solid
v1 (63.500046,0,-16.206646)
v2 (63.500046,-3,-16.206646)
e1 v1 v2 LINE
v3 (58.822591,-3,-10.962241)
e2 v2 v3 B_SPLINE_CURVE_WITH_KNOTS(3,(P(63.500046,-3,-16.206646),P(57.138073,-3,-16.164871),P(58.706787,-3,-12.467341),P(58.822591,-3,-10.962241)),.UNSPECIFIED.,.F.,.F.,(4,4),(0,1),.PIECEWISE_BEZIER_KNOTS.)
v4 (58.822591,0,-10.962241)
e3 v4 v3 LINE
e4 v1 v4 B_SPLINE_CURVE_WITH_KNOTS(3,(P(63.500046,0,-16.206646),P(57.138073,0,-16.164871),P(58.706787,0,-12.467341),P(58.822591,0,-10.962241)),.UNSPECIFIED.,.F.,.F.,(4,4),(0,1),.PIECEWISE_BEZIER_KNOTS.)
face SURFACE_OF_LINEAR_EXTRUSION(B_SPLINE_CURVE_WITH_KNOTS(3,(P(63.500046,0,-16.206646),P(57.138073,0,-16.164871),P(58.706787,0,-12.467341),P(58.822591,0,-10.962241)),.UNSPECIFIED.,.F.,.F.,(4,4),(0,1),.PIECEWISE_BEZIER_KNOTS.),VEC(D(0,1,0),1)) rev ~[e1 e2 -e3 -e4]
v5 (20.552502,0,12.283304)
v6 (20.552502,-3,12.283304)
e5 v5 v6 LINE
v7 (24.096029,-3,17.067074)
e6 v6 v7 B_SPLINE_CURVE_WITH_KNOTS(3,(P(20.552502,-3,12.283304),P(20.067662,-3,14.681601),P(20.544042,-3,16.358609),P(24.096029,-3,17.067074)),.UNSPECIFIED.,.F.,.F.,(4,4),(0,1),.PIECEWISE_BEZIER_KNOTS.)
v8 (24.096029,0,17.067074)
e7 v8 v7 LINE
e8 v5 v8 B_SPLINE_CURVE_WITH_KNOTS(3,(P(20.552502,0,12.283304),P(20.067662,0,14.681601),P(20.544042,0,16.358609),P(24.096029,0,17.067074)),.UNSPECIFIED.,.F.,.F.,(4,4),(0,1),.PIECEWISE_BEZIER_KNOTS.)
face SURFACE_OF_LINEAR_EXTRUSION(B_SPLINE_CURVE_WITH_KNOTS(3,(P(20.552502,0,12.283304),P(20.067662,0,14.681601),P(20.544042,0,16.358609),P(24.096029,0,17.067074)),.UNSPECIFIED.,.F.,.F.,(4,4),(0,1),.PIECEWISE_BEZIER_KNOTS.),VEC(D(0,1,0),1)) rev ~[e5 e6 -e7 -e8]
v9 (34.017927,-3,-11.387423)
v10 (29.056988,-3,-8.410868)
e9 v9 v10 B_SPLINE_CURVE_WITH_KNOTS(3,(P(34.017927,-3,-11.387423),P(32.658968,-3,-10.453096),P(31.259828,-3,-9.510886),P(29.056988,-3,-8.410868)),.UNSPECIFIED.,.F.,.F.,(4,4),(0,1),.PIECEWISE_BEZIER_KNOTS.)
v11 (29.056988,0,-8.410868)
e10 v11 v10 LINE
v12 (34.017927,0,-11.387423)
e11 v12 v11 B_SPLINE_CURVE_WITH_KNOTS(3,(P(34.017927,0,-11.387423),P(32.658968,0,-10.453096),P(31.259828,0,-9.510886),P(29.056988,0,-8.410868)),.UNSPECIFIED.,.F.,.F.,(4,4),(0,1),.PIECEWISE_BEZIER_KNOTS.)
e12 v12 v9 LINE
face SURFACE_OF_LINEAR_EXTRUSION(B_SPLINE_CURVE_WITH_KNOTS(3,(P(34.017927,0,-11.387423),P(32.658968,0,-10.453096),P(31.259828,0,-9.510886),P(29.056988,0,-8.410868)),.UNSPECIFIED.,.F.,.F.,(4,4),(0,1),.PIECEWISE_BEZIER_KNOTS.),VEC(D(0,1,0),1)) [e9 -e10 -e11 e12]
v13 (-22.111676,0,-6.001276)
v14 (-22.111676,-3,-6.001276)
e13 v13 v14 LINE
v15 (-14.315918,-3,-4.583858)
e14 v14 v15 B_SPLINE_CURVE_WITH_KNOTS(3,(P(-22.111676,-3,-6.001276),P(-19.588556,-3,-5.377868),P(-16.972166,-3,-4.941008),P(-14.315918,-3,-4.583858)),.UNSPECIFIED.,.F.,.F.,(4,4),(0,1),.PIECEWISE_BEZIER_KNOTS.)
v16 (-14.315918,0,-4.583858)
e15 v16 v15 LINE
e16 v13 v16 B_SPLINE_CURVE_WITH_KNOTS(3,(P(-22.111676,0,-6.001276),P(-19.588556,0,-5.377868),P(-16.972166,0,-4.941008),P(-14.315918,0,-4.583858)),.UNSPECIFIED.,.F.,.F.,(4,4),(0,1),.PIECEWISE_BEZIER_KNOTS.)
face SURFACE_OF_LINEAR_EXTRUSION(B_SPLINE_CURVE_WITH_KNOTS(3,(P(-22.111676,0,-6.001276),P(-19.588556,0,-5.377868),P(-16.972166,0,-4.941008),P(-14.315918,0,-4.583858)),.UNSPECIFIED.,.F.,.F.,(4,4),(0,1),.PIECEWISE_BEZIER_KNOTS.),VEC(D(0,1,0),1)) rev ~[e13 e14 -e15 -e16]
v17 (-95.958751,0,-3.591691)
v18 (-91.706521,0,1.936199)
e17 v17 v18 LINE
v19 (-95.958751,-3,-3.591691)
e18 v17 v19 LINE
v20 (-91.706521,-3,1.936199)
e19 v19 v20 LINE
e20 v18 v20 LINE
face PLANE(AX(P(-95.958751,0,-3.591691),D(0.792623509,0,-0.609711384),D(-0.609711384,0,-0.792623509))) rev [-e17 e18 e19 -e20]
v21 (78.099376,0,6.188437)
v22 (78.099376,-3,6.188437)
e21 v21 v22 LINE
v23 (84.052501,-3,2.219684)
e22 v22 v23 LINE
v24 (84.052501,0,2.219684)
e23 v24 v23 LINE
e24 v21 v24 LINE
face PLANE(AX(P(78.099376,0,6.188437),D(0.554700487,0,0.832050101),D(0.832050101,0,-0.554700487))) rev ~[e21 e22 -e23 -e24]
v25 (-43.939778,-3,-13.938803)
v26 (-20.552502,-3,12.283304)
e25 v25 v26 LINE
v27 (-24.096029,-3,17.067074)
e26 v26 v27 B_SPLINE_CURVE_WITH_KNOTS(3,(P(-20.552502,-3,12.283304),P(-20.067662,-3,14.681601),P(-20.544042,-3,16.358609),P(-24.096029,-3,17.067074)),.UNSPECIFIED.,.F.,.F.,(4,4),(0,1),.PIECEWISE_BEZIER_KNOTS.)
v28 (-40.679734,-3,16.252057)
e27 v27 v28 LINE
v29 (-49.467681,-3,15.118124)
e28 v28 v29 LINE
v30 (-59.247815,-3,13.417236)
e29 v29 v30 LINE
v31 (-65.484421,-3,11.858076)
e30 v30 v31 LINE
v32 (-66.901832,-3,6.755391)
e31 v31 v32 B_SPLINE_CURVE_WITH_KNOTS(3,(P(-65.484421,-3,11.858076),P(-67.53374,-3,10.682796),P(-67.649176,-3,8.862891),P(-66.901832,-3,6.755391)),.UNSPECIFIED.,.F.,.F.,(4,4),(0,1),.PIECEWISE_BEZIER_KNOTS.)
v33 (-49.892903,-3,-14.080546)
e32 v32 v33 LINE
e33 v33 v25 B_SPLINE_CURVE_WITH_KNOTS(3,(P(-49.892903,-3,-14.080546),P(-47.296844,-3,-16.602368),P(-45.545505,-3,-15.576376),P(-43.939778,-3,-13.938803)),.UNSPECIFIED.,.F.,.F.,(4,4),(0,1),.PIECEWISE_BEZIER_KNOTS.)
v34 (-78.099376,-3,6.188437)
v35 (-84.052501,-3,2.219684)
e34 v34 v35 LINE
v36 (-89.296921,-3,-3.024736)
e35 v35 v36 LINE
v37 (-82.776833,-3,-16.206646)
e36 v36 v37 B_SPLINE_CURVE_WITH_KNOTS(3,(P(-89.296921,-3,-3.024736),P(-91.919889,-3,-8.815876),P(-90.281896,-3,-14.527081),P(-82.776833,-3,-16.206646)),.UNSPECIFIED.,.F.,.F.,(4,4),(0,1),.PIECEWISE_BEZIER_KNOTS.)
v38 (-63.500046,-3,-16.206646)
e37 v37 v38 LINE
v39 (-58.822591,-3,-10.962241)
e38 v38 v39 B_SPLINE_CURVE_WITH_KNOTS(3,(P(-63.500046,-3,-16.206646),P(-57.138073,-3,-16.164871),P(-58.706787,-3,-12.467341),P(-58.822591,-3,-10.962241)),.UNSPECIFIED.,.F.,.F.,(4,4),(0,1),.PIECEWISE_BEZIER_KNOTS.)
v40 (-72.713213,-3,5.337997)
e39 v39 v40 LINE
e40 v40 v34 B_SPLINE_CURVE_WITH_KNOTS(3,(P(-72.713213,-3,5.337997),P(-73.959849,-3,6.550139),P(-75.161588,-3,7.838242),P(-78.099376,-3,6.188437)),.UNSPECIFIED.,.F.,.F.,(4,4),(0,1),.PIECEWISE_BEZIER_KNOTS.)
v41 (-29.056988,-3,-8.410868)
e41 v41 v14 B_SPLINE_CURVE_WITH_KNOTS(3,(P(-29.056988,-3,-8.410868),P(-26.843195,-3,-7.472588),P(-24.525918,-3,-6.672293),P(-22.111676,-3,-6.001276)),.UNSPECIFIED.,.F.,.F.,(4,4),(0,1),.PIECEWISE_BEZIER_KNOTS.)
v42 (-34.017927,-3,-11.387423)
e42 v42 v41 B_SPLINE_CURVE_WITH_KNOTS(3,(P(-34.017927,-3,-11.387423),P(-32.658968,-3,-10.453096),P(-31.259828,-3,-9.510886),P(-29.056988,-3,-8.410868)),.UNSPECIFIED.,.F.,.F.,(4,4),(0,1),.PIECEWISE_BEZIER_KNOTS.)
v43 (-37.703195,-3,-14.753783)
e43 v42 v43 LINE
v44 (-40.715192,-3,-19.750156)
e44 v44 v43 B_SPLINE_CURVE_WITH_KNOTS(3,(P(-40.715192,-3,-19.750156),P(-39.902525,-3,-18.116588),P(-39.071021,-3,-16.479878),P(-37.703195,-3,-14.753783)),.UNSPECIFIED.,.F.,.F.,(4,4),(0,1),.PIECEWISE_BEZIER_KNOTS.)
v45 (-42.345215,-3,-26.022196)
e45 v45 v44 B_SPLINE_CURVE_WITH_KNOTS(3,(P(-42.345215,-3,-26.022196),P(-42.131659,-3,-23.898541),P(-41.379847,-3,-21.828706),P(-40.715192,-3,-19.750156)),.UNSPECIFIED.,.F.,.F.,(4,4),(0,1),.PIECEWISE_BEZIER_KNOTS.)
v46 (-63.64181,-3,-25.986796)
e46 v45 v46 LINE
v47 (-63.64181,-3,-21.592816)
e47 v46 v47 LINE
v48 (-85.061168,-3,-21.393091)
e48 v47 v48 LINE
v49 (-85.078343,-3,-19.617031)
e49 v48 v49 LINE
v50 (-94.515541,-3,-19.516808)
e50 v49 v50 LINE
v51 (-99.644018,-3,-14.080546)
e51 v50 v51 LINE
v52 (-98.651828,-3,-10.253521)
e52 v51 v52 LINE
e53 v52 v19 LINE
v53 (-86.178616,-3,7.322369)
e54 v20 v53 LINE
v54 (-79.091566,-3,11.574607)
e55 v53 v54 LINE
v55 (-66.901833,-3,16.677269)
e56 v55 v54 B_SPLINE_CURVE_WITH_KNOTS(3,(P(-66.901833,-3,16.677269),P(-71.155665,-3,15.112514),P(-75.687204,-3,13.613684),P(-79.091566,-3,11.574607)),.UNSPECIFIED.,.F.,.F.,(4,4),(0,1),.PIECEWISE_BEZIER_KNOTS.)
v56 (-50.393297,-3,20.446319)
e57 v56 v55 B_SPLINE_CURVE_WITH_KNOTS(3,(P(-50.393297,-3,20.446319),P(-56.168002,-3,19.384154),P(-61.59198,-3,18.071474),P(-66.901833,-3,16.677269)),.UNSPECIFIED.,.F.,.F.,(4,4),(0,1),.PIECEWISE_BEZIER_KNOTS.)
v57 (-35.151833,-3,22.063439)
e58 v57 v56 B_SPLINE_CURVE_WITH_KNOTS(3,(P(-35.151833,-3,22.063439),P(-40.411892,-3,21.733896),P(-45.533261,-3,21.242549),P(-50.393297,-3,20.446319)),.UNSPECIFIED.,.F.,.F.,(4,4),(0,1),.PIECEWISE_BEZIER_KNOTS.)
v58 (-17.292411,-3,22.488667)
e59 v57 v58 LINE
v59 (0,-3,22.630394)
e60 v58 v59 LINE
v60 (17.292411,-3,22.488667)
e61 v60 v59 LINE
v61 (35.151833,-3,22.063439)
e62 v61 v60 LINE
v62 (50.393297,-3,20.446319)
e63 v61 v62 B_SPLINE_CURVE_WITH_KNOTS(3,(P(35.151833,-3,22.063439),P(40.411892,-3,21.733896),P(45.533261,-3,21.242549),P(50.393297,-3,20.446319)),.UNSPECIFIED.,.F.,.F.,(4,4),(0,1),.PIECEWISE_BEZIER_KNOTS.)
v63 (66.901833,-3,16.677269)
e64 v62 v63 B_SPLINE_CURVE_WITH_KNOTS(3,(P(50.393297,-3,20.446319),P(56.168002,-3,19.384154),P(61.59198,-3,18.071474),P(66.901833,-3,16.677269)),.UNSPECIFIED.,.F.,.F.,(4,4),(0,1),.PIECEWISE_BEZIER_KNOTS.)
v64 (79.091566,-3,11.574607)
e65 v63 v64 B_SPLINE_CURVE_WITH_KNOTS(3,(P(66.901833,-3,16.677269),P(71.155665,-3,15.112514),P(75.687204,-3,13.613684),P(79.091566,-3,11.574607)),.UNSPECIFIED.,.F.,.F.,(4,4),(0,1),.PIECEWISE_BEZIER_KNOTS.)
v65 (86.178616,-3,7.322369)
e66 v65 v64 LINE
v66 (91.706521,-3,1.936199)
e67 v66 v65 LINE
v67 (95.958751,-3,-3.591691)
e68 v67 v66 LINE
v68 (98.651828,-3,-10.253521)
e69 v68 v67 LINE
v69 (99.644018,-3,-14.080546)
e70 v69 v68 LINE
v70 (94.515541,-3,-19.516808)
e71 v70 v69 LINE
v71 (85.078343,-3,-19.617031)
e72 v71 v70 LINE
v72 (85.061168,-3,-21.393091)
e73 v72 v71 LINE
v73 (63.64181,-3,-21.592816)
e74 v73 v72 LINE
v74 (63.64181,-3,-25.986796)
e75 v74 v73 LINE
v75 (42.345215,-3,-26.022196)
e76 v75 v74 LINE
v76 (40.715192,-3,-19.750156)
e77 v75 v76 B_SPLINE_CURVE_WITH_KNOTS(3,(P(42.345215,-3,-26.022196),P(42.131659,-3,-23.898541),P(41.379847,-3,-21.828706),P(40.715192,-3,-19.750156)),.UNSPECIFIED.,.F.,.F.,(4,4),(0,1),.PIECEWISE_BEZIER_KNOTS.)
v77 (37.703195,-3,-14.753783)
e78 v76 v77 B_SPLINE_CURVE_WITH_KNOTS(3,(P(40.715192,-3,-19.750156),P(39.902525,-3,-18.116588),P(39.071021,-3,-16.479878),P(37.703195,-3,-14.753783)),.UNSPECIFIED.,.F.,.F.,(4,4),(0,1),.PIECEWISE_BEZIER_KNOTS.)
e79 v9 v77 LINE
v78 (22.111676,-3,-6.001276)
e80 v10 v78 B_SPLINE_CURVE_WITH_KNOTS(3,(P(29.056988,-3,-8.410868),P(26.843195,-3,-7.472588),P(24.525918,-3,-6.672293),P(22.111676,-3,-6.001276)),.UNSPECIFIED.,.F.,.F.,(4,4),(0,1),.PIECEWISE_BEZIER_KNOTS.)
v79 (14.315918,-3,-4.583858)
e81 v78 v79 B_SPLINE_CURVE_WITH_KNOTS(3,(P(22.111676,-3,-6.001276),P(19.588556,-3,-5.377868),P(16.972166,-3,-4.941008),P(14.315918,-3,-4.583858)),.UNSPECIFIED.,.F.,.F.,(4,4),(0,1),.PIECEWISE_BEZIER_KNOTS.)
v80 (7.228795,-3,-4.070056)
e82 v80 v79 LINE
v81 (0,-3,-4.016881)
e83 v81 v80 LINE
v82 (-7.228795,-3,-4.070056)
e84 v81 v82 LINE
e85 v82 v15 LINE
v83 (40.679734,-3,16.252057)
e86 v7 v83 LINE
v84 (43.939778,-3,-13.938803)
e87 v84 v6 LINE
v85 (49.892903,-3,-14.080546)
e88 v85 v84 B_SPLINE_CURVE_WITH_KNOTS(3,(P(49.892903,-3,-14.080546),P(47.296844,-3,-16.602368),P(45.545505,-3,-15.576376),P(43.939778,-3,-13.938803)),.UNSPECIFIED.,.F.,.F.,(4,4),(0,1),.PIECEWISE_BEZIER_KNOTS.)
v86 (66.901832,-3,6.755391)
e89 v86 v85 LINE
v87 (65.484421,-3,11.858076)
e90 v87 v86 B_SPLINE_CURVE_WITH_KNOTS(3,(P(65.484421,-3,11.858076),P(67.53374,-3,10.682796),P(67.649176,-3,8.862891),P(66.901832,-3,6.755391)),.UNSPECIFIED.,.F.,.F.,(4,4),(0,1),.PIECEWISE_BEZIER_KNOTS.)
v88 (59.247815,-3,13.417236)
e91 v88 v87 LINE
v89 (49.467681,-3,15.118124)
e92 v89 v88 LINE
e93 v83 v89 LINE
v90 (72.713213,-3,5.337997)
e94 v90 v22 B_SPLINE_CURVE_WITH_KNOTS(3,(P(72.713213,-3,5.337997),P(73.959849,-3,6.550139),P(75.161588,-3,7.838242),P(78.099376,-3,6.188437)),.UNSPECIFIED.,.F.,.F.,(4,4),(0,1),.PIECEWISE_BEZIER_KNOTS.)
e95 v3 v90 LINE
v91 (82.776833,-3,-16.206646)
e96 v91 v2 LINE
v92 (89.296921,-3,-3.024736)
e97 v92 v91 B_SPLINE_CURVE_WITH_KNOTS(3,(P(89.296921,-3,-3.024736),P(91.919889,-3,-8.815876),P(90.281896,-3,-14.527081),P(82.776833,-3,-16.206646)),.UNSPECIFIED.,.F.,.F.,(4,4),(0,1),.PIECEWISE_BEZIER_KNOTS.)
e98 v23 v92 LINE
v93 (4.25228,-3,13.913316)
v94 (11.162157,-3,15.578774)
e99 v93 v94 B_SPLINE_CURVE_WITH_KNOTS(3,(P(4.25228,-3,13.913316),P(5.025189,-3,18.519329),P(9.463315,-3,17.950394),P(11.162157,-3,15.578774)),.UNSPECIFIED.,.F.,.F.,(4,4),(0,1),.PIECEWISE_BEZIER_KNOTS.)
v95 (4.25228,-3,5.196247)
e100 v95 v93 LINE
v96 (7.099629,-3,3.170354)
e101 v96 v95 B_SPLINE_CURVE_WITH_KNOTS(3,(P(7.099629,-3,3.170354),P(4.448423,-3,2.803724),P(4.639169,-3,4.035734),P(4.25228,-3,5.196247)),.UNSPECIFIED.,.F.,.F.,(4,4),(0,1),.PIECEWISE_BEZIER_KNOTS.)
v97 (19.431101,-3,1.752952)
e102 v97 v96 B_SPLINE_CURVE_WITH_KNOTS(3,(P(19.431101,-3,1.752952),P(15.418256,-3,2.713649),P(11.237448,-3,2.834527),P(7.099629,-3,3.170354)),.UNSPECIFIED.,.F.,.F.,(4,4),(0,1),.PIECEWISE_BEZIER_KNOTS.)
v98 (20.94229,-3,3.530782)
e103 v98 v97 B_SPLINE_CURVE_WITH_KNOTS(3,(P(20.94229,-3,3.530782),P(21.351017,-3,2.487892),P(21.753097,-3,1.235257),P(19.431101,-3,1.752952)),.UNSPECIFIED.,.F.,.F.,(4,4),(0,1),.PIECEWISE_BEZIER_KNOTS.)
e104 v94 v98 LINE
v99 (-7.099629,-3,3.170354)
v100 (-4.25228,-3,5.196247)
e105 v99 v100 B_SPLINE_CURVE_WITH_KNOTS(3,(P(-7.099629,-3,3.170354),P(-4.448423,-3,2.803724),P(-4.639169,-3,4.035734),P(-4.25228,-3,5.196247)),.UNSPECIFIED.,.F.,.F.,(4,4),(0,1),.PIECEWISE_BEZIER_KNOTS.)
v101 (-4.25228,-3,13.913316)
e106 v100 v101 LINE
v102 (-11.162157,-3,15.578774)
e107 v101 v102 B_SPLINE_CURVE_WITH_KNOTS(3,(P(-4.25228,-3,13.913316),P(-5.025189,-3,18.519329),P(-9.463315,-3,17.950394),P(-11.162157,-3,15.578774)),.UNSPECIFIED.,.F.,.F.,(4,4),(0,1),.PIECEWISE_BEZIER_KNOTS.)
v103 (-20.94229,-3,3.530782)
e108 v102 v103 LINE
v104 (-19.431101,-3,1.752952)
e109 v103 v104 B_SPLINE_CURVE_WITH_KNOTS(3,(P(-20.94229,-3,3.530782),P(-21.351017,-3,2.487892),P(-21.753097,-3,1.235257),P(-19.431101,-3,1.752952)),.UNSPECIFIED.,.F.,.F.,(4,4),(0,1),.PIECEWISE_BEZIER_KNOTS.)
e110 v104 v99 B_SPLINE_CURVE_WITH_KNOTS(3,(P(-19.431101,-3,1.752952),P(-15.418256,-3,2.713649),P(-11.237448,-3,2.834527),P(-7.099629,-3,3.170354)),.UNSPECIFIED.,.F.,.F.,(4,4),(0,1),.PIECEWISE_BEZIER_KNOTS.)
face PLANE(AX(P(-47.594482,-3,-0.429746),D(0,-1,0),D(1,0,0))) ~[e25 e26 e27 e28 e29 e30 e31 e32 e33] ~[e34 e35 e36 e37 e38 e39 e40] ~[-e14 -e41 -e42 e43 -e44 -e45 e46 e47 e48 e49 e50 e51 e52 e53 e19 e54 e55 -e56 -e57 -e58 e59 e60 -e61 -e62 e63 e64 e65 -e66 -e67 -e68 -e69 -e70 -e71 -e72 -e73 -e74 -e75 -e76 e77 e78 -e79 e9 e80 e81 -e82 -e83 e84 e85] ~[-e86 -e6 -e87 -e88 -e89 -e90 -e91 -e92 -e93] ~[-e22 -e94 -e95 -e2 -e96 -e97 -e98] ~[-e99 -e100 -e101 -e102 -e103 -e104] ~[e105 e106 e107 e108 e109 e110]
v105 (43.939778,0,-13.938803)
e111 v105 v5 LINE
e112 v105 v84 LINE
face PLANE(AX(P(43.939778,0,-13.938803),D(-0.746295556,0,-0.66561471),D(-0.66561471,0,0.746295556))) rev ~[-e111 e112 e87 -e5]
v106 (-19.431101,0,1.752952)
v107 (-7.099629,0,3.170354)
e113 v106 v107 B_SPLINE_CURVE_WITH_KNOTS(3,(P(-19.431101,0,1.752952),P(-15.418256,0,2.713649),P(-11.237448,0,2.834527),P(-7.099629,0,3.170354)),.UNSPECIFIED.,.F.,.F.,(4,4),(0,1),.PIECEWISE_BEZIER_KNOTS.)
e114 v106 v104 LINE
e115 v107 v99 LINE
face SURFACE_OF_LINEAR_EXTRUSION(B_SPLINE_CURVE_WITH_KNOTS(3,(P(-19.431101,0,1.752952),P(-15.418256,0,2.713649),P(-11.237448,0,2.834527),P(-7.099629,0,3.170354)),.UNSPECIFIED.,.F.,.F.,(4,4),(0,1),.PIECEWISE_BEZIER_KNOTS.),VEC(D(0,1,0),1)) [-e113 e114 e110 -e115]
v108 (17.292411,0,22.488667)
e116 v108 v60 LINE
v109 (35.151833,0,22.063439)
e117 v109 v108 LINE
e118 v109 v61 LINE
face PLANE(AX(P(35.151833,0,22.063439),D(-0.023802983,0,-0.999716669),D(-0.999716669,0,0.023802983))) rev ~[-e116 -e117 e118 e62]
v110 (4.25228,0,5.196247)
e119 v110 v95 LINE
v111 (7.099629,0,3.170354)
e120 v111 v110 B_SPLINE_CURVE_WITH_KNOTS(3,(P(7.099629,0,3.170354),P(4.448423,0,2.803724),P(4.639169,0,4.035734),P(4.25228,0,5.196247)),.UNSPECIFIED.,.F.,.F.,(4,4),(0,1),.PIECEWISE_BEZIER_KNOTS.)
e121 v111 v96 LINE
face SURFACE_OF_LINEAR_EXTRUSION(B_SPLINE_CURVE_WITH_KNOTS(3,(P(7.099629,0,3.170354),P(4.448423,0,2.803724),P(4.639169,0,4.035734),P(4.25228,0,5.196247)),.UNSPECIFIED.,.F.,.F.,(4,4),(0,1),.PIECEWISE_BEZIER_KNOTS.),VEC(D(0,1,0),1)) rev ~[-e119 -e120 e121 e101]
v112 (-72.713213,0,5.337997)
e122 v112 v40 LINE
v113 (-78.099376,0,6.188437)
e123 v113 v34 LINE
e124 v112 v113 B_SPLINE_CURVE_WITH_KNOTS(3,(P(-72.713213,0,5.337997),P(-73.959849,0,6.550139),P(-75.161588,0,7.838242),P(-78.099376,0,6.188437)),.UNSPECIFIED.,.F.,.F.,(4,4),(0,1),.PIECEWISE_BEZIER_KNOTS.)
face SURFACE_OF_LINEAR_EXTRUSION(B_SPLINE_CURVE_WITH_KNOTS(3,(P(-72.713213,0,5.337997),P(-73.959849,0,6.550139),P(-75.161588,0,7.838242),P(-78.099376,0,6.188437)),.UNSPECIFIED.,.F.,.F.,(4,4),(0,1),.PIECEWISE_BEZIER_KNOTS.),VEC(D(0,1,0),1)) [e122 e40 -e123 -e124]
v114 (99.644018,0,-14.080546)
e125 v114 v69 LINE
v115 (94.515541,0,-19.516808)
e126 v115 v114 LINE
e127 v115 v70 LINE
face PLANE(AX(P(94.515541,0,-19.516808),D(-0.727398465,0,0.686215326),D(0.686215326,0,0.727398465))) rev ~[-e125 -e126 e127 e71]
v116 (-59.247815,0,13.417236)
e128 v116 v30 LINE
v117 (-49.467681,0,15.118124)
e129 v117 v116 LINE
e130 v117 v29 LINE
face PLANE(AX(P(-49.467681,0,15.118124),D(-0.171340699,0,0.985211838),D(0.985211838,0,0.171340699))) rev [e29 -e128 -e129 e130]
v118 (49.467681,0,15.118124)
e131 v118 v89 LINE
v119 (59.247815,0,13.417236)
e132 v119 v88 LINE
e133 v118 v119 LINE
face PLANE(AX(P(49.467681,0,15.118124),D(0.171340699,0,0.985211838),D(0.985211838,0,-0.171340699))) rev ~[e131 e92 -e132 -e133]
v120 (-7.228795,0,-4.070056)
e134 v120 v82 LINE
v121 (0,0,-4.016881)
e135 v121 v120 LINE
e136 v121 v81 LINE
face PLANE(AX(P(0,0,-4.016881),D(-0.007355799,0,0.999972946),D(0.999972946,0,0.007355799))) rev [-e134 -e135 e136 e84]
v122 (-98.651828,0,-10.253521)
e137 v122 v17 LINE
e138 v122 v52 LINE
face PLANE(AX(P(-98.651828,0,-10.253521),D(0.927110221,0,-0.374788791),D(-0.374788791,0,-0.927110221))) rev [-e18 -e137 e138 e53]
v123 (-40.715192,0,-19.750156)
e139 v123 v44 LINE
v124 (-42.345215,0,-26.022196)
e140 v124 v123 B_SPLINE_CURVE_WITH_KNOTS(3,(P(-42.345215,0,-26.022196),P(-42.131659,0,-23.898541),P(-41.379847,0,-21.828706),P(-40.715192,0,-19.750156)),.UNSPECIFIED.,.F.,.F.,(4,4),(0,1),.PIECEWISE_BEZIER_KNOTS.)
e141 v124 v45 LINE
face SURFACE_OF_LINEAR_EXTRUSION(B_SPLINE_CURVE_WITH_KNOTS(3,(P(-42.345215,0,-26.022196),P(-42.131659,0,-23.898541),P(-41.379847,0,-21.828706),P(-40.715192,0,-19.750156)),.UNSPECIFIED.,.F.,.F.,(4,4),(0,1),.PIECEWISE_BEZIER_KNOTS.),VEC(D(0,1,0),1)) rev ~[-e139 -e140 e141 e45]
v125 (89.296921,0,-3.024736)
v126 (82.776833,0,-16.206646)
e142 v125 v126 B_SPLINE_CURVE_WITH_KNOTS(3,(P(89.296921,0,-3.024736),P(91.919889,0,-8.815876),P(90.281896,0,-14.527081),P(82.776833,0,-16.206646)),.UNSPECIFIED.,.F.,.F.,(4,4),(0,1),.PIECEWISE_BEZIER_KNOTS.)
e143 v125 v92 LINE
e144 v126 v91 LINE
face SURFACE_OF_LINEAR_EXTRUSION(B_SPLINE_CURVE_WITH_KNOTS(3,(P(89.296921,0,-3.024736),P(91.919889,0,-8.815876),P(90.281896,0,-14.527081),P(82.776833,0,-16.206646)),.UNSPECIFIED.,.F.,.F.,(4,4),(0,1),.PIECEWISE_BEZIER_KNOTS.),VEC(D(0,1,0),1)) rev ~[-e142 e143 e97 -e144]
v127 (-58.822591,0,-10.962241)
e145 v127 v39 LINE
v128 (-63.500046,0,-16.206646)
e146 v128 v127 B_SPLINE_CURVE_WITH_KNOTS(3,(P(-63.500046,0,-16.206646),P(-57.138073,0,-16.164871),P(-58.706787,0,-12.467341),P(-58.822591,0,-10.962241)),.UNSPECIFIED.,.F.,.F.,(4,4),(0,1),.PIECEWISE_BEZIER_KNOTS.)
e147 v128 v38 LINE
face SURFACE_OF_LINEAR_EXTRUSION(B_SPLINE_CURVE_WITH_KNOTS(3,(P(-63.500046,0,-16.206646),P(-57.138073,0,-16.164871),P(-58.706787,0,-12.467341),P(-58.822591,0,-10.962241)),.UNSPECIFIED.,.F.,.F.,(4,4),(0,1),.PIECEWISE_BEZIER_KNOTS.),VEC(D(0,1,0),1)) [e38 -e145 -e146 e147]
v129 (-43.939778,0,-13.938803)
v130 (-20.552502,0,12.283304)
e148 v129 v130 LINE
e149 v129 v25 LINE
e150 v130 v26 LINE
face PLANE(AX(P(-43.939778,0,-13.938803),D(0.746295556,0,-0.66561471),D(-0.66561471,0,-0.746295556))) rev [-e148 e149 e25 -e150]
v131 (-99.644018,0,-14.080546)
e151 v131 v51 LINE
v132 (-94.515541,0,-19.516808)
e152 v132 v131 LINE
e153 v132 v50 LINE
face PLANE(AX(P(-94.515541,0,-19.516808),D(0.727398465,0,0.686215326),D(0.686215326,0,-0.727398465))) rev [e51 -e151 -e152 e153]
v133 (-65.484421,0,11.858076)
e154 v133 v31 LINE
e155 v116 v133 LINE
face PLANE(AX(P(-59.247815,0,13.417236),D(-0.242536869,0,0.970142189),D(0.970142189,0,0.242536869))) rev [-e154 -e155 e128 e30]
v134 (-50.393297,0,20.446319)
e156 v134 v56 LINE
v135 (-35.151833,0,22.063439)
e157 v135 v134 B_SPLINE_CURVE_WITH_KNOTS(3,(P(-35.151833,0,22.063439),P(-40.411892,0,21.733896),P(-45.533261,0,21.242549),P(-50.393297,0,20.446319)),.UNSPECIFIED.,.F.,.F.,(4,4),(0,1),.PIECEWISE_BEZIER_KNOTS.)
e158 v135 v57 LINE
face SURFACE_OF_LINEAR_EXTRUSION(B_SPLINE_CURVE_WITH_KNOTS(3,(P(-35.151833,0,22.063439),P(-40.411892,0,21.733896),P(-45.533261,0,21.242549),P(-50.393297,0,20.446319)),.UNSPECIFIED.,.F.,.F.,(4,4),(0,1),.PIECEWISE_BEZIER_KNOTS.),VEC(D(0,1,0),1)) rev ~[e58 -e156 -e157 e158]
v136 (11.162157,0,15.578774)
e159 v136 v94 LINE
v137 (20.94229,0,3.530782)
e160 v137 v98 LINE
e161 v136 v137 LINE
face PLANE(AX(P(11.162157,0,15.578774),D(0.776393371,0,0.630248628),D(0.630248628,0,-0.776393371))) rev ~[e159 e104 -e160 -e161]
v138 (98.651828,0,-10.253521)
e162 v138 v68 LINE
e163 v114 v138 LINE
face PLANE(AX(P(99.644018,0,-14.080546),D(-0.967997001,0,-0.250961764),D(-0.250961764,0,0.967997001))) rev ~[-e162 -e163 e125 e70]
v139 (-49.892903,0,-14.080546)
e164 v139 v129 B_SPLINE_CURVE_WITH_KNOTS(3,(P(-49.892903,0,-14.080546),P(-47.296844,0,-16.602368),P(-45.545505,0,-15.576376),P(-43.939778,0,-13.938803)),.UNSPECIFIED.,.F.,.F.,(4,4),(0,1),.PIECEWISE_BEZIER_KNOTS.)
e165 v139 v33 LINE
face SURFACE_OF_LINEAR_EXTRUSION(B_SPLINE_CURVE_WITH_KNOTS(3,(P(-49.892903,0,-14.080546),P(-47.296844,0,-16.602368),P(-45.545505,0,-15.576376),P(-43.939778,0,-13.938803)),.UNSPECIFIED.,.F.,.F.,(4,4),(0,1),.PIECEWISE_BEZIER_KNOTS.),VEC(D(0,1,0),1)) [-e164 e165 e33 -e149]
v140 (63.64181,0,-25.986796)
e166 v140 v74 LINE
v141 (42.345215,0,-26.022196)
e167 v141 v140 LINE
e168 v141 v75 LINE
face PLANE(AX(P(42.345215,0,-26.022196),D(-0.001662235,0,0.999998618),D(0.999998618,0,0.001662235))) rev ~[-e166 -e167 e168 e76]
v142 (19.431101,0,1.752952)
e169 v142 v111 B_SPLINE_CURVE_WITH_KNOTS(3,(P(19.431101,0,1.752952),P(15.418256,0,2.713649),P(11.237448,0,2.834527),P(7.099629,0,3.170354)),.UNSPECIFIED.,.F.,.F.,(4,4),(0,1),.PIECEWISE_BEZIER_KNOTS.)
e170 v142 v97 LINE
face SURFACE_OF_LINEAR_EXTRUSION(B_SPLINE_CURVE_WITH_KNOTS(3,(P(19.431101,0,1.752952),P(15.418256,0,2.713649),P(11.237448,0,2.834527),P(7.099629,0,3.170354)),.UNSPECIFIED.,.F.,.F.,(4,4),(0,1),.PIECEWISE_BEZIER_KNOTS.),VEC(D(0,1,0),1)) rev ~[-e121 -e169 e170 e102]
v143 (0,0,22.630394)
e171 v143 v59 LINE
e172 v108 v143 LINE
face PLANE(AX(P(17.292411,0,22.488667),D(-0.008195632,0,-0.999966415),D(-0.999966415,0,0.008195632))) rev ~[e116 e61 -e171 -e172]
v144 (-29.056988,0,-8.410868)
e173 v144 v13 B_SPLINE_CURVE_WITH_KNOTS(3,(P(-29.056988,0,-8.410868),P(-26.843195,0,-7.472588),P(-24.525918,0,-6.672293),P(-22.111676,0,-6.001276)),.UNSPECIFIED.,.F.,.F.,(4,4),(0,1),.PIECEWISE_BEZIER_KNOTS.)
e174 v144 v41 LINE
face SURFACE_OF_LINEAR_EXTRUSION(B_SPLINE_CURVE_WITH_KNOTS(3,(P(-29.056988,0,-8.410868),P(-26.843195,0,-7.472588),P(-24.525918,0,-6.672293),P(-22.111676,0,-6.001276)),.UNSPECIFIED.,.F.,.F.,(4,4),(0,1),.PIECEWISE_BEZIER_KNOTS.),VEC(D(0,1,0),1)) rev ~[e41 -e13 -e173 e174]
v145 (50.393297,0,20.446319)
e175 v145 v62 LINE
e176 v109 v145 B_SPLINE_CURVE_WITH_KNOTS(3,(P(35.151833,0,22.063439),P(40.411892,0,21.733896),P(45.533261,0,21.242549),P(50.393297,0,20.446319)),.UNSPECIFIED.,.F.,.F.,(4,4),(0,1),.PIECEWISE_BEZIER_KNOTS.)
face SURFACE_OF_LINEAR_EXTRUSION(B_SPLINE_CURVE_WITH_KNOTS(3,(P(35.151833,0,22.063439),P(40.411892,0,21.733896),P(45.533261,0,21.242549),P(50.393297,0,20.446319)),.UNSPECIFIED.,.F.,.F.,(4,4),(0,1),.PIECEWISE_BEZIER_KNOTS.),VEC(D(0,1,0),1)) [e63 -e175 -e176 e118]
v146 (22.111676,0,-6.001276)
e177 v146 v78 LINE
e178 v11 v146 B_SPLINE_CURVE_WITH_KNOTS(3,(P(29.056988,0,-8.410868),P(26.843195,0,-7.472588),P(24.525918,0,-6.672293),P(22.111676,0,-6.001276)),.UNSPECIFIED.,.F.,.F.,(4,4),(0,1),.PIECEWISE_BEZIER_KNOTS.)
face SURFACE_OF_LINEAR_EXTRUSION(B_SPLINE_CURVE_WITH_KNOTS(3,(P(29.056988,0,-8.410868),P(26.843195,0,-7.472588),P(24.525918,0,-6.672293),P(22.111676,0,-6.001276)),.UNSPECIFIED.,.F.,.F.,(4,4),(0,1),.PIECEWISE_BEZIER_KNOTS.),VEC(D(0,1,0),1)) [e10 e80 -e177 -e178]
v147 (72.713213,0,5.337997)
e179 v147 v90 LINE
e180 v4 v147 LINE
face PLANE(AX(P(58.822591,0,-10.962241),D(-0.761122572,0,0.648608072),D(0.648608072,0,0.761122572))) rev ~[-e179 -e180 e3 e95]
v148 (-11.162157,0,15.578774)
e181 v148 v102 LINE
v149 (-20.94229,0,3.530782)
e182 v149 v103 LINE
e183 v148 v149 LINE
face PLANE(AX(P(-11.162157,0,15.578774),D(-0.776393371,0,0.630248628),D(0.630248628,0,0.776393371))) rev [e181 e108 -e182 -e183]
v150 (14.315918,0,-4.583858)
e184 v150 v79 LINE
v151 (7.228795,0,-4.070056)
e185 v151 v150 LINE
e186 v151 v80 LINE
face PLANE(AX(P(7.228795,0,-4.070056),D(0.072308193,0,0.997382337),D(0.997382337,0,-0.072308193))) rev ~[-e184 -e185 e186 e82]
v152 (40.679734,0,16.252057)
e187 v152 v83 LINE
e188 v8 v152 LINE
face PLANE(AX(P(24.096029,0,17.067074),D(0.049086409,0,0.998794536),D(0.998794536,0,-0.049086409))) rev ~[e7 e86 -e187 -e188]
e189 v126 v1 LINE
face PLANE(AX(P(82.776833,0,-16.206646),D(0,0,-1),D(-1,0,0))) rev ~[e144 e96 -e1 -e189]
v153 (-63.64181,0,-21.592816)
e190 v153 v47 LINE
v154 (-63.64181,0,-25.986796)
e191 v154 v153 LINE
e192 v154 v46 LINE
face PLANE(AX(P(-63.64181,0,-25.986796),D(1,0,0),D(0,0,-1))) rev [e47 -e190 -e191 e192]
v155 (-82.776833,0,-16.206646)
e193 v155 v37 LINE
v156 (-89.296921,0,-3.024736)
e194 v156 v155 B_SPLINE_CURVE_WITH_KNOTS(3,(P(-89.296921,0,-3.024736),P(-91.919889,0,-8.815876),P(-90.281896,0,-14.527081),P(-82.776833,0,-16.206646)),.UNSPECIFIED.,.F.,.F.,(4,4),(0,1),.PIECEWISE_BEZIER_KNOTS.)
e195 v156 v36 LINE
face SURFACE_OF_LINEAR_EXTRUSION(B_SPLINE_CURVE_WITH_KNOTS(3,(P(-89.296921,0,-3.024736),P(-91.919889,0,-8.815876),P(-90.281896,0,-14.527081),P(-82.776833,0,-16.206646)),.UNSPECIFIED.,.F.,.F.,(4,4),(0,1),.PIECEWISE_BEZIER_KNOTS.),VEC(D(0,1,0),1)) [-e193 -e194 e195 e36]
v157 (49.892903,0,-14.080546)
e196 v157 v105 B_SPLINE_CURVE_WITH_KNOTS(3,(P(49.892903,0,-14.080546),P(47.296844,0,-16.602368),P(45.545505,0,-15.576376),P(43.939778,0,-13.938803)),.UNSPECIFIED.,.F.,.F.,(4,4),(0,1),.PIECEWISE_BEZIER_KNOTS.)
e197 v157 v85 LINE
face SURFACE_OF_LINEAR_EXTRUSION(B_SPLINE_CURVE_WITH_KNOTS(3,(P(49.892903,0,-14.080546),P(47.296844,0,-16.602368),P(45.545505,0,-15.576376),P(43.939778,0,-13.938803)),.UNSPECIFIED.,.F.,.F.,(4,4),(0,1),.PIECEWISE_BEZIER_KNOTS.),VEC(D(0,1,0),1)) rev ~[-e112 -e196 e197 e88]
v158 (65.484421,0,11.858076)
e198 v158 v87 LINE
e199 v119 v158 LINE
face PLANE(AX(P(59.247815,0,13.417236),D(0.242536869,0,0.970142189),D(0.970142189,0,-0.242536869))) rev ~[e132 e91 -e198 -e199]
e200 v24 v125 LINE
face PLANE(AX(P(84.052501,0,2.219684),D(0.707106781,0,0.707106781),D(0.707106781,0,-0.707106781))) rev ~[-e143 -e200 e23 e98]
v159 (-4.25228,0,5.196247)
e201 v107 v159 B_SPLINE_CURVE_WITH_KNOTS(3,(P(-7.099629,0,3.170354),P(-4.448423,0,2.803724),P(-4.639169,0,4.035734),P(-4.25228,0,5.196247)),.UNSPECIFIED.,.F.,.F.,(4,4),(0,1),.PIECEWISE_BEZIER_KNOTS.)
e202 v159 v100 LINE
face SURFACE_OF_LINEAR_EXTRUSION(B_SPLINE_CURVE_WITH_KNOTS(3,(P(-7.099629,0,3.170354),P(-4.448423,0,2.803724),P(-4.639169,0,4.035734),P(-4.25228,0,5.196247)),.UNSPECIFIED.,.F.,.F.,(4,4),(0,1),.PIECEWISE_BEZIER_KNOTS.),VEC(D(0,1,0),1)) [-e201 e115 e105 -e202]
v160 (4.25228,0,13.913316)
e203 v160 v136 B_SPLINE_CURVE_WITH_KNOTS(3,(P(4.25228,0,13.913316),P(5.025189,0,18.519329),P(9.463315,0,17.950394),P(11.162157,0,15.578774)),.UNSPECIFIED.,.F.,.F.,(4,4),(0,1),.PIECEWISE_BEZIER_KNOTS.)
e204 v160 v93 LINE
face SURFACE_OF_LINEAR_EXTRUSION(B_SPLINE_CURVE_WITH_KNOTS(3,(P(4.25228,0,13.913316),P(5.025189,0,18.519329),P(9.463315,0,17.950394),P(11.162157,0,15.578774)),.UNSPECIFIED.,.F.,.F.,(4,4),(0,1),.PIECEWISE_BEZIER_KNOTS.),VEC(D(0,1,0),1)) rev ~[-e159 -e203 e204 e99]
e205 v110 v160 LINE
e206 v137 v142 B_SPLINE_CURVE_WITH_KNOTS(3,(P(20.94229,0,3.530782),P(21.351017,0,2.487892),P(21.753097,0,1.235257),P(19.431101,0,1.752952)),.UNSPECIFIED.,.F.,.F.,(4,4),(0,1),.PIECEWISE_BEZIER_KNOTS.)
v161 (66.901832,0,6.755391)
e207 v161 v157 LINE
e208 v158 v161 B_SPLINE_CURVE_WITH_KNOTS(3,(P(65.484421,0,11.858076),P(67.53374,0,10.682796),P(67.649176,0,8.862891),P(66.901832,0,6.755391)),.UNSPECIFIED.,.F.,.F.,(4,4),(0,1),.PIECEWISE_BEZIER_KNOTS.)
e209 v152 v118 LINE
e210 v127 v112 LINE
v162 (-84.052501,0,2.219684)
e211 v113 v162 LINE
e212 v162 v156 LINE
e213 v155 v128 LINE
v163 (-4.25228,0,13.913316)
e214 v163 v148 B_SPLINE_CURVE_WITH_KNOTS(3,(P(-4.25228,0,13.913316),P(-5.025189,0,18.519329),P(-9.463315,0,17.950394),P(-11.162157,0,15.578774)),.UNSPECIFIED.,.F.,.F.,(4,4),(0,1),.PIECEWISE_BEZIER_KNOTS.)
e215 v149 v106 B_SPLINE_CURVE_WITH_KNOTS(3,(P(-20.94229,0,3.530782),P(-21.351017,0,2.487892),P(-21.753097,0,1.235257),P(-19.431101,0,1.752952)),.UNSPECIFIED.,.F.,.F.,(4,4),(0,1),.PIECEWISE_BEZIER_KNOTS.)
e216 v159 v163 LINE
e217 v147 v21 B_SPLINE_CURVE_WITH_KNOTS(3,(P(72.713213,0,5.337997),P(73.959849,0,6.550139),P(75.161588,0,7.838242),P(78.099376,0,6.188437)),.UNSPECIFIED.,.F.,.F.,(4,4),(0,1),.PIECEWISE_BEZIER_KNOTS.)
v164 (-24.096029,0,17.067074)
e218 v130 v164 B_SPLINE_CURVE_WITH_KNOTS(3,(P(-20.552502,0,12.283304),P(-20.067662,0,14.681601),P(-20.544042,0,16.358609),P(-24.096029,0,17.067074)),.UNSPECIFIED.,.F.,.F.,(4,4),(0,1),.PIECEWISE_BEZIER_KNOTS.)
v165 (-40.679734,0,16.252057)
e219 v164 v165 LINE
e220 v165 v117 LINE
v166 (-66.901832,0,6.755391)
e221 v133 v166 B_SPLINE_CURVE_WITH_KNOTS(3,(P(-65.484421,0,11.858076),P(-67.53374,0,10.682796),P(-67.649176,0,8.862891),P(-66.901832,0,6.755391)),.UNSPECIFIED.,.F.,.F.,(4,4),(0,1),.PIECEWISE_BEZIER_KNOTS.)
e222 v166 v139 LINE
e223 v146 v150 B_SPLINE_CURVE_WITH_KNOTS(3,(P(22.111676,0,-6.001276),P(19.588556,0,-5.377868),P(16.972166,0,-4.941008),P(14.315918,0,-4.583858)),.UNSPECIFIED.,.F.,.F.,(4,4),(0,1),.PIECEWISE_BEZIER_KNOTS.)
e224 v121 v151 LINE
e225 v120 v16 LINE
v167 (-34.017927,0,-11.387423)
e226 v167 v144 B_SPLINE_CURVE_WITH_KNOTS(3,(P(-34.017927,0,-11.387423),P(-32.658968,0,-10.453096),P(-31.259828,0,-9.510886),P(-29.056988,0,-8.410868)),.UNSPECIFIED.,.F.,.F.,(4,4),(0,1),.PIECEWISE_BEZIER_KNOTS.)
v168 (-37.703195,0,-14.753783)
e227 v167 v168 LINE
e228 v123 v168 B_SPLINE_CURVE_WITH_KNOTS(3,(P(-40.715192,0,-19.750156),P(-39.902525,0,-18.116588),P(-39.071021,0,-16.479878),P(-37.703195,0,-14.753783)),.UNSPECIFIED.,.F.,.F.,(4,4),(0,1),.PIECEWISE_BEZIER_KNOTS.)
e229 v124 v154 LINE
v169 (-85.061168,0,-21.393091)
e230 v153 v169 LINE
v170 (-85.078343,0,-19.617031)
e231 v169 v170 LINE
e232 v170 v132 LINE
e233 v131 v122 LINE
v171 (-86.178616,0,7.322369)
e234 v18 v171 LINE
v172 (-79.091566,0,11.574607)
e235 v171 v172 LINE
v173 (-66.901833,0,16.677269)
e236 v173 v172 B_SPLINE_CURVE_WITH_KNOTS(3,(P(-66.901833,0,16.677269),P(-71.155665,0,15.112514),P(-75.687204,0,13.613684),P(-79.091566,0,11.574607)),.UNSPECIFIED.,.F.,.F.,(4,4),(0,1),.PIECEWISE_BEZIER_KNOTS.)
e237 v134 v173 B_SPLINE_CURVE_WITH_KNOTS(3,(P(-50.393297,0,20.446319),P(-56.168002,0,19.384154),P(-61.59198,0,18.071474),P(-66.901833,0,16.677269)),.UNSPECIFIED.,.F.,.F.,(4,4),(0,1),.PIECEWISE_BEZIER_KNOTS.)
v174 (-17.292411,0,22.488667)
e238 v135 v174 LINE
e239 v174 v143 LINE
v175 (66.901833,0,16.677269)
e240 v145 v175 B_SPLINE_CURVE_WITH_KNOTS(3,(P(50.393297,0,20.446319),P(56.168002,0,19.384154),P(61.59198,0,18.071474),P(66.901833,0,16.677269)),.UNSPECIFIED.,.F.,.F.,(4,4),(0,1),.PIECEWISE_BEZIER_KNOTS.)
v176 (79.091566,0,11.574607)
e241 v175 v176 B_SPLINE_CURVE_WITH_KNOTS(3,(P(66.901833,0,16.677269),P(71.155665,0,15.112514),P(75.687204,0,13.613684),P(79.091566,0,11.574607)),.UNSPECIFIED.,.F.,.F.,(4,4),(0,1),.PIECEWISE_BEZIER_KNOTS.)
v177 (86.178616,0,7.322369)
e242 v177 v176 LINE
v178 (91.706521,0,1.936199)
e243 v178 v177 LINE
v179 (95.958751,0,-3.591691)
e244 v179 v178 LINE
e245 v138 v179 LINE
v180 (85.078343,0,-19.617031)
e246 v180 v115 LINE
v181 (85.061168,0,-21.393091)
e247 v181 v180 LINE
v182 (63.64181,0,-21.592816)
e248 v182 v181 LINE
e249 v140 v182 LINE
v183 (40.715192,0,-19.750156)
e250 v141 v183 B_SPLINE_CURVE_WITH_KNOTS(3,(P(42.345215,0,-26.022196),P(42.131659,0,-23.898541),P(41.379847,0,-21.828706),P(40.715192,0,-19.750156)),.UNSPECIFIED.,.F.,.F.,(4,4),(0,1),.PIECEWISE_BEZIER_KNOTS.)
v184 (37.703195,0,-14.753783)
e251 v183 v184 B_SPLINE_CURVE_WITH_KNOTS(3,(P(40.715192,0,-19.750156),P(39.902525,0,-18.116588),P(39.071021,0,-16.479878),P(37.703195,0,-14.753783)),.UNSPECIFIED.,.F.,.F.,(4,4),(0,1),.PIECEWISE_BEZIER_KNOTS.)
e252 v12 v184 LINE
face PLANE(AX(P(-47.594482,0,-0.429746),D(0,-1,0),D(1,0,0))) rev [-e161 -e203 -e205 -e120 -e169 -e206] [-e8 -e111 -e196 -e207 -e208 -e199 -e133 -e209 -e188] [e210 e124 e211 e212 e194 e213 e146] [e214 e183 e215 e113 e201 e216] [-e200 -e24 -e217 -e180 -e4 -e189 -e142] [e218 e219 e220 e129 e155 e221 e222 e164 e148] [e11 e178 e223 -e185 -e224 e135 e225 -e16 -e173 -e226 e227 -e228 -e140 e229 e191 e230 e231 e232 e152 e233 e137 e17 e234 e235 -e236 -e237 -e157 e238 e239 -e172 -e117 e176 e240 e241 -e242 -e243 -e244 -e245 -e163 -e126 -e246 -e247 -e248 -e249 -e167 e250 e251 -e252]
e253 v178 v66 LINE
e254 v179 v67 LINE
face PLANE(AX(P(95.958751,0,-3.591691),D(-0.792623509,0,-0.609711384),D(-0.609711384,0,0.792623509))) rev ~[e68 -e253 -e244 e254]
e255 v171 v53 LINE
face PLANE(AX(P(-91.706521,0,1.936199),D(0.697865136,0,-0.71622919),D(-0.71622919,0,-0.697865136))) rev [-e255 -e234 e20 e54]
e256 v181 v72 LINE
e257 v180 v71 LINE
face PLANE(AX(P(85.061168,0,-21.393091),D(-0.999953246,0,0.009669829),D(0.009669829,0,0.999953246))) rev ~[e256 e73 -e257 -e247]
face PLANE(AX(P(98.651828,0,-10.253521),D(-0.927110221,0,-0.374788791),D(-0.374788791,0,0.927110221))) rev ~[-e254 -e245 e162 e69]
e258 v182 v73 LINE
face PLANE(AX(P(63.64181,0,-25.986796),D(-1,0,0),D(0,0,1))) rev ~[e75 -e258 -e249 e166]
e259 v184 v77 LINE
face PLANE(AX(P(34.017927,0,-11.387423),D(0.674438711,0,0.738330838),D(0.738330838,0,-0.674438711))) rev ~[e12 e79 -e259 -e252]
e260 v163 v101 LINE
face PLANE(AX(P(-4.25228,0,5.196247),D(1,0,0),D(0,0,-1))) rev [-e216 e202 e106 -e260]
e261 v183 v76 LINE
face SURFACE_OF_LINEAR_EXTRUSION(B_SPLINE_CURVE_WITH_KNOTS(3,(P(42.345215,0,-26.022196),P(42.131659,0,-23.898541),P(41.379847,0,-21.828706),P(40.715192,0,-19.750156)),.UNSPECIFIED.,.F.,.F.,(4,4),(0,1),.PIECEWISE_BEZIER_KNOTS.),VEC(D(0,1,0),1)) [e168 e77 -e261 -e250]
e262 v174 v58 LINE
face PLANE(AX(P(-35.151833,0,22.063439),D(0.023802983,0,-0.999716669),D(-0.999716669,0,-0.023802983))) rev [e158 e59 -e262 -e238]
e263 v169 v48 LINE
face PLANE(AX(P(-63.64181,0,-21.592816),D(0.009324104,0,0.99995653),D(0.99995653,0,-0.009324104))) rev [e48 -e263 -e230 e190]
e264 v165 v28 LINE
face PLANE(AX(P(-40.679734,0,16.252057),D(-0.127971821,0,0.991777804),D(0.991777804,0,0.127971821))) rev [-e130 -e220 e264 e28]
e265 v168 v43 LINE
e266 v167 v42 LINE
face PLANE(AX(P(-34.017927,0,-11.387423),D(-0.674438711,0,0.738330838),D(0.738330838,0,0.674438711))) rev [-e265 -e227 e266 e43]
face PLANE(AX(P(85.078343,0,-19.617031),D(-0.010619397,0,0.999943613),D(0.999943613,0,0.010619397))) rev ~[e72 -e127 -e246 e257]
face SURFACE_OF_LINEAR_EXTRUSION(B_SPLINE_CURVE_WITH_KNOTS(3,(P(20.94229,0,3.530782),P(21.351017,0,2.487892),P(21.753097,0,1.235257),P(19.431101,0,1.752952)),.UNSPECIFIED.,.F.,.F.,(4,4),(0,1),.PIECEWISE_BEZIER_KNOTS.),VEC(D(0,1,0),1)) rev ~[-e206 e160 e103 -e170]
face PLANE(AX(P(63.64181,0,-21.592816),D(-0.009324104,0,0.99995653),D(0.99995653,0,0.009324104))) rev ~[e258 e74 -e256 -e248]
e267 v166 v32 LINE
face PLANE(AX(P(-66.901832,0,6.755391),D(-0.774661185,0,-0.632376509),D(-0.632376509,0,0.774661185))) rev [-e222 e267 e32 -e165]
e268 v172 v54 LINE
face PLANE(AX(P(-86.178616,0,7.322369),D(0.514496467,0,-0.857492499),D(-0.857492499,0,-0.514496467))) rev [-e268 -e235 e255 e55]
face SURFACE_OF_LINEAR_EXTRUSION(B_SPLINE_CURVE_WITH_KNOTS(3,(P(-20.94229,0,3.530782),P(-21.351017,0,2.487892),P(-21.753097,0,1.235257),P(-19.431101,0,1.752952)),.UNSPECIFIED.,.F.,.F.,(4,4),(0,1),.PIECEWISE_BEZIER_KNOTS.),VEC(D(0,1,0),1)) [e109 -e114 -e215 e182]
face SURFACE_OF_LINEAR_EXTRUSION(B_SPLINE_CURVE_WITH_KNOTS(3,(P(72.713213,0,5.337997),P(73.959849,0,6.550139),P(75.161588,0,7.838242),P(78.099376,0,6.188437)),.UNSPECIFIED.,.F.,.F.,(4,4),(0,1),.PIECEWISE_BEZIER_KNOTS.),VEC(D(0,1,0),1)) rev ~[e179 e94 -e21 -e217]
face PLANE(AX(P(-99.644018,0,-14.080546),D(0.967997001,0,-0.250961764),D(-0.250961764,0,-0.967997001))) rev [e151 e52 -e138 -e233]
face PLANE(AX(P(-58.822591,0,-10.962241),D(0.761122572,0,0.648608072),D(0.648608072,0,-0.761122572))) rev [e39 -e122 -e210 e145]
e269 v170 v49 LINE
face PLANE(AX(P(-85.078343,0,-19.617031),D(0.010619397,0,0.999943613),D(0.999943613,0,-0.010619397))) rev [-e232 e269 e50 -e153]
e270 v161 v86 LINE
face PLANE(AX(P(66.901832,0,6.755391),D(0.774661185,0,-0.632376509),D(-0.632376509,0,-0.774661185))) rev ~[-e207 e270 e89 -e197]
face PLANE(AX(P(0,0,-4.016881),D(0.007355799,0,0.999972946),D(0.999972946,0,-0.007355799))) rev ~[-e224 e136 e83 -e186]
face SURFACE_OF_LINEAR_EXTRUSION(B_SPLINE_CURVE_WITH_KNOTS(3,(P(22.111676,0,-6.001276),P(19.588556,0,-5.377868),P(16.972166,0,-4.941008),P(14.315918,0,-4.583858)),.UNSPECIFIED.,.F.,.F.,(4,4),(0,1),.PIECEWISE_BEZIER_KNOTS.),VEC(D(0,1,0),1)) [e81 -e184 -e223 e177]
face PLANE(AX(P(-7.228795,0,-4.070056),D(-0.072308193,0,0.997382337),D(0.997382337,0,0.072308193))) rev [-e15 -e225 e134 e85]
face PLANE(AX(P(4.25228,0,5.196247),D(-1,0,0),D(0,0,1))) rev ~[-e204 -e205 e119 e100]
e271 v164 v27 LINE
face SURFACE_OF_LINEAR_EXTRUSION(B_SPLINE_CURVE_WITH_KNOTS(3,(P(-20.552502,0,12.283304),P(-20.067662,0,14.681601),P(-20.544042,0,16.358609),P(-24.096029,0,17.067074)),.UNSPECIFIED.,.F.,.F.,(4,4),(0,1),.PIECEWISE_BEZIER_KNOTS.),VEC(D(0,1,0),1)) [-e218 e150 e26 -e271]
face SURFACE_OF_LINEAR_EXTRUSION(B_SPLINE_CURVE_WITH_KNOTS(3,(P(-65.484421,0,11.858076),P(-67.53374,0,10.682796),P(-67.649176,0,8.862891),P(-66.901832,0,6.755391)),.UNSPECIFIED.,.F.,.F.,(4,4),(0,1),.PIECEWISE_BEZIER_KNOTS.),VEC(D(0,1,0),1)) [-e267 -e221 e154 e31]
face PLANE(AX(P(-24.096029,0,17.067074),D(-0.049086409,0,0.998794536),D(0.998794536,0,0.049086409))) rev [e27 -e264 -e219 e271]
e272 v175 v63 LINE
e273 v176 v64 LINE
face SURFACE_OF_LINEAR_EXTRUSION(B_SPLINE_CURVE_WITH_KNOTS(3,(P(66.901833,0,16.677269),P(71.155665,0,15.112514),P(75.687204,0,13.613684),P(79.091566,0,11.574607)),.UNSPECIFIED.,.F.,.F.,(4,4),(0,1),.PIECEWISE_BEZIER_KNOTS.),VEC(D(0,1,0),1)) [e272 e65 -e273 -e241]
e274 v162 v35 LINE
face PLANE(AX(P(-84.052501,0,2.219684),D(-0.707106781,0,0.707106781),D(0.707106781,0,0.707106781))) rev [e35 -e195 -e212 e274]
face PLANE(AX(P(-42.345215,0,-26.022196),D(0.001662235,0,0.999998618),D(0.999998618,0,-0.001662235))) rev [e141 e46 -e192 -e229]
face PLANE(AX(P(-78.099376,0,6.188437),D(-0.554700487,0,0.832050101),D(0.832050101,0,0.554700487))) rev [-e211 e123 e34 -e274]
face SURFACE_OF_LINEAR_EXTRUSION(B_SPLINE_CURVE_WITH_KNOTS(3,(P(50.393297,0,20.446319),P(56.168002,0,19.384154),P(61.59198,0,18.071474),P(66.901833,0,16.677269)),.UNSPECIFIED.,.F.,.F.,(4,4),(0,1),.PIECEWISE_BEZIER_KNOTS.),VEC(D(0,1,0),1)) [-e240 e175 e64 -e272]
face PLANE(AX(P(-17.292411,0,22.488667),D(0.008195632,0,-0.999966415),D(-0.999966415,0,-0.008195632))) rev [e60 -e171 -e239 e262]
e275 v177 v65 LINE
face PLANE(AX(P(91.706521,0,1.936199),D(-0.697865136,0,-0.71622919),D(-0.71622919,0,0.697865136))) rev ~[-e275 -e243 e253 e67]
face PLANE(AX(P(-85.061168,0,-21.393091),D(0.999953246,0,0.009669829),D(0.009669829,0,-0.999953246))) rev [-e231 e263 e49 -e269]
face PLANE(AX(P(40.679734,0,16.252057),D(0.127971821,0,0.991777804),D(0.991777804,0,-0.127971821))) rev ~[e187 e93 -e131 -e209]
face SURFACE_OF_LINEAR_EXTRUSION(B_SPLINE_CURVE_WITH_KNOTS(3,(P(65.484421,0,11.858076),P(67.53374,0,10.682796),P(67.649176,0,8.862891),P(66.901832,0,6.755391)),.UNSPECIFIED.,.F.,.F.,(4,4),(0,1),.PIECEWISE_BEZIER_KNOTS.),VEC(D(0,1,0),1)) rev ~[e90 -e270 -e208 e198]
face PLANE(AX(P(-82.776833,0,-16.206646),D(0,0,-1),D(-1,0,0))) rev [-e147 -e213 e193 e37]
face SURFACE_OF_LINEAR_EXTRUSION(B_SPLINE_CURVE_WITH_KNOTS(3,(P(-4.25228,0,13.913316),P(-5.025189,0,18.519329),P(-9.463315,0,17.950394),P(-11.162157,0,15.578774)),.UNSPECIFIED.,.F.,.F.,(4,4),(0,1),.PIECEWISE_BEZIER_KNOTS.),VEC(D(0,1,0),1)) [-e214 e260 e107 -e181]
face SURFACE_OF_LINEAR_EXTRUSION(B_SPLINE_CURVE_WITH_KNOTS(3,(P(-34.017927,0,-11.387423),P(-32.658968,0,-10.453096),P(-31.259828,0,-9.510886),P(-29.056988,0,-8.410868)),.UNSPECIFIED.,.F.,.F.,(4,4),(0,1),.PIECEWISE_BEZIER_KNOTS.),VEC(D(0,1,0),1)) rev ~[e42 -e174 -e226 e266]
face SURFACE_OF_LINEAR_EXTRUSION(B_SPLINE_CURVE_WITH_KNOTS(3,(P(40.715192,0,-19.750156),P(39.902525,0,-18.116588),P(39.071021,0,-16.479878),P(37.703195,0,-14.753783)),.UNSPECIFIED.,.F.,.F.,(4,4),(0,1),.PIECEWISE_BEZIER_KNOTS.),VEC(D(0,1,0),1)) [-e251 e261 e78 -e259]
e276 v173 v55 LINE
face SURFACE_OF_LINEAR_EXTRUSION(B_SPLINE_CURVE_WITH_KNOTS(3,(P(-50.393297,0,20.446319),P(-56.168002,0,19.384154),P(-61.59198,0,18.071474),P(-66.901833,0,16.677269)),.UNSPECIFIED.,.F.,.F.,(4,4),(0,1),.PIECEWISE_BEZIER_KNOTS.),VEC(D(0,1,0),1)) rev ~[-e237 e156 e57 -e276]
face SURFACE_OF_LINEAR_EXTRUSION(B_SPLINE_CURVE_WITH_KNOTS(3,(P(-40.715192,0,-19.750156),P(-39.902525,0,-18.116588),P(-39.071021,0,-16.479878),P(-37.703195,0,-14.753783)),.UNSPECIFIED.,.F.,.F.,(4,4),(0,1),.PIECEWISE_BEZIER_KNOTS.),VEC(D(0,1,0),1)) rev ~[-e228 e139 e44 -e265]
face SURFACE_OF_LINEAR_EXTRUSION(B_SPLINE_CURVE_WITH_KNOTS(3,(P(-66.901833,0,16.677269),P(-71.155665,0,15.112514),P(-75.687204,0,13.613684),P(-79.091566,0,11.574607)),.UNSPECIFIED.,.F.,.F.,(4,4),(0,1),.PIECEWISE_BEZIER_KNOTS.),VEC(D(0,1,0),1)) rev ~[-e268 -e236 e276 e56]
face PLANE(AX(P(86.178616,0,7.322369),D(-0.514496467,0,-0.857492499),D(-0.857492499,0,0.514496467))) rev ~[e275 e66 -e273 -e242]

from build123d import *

# Parameters (mm, degrees)
F1_DEPTH = 3


# Not quite as in the source:
# - ends of sketch curves that miss each other by under 0.0002 mm in the source are joined


with BuildPart() as f1:
    # F0 (on Front) → F1 (new body)
    with BuildSketch(Plane.XZ):
        with BuildLine():
            Line((17.292411, 22.4886673102), (0, 22.6303943102))
            Line((0, 22.6303943102), (0, -4.0168806898))
            Line((0, -4.0168806898), (7.228795, -4.0700556898))
            Line((7.228795, -4.0700556898), (14.3159177513, -4.5838576898))
            add(Edge.make_bspline(
                [(22.1116757513, -6.0012756898), (19.5885557513, -5.3778676898), (16.9721657513, -4.9410076898), (14.3159177513, -4.5838576898)],
                knots=[0, 0, 0, 0, 1, 1, 1, 1], degree=3))
            add(Edge.make_bspline(
                [(29.0569877513, -8.4108676898), (26.8431947513, -7.4725876898), (24.5259177513, -6.6722926898), (22.1116757513, -6.0012756898)],
                knots=[0, 0, 0, 0, 1, 1, 1, 1], degree=3))
            add(Edge.make_bspline(
                [(34.0179267513, -11.3874226898), (32.6589677513, -10.4530956898), (31.2598277513, -9.5108856898), (29.0569877513, -8.4108676898)],
                knots=[0, 0, 0, 0, 1, 1, 1, 1], degree=3))
            Line((34.0179267513, -11.3874226898), (37.7031947513, -14.7537826898))
            add(Edge.make_bspline(
                [(40.7151917513, -19.7501556898), (39.9025247513, -18.1165876898), (39.0710207513, -16.4798776898), (37.7031947513, -14.7537826898)],
                knots=[0, 0, 0, 0, 1, 1, 1, 1], degree=3))
            add(Edge.make_bspline(
                [(42.3452147513, -26.0221956898), (42.1316587513, -23.8985406898), (41.3798467513, -21.8287056898), (40.7151917513, -19.7501556898)],
                knots=[0, 0, 0, 0, 1, 1, 1, 1], degree=3))
            Line((42.3452147513, -26.0221956898), (63.6418097513, -25.9867956898))
            Line((63.6418097513, -25.9867956898), (63.6418097513, -21.5928156898))
            Line((63.6418097513, -21.5928156898), (85.0611677513, -21.3930906898))
            Line((85.0611677513, -21.3930906898), (85.0783427513, -19.6170306898))
            Line((85.0783427513, -19.6170306898), (94.5155407513, -19.5168076898))
            Line((94.5155407513, -19.5168076898), (99.6440177513, -14.0805456898))
            Line((99.6440177513, -14.0805456898), (98.6518277513, -10.2535206898))
            Line((98.6518277513, -10.2535206898), (95.9587507513, -3.5916906898))
            Line((95.9587507513, -3.5916906898), (91.7065207513, 1.9361993102))
            Line((91.7065207513, 1.9361993102), (86.1786157513, 7.3223693102))
            Line((86.1786157513, 7.3223693102), (79.0915657513, 11.5746073102))
            add(Edge.make_bspline(
                [(66.9018327513, 16.6772693102), (71.1556647513, 15.1125143102), (75.6872037513, 13.6136843102), (79.0915657513, 11.5746073102)],
                knots=[0, 0, 0, 0, 1, 1, 1, 1], degree=3))
            add(Edge.make_bspline(
                [(50.3932967513, 20.4463193102), (56.1680017513, 19.3841543102), (61.5919797513, 18.0714743102), (66.9018327513, 16.6772693102)],
                knots=[0, 0, 0, 0, 1, 1, 1, 1], degree=3))
            add(Edge.make_bspline(
                [(35.1518327513, 22.0634393102), (40.4118917513, 21.7338963102), (45.5332607513, 21.2425493102), (50.3932967513, 20.4463193102)],
                knots=[0, 0, 0, 0, 1, 1, 1, 1], degree=3))
            Line((35.1518327513, 22.0634393102), (17.292411, 22.4886673102))
        make_face()
        with BuildLine():
            add(Edge.make_bspline(
                [(72.7132127513, 5.3379973102), (73.9598487513, 6.5501393102), (75.1615877513, 7.8382423102), (78.0993757513, 6.1884373102)],
                knots=[0, 0, 0, 0, 1, 1, 1, 1], degree=3))
            Line((78.0993757513, 6.1884373102), (84.0525007513, 2.2196843102))
            Line((84.0525007513, 2.2196843102), (89.2969207513, -3.0247356898))
            add(Edge.make_bspline(
                [(89.2969207513, -3.0247356898), (91.9198887513, -8.8158756898), (90.2818957513, -14.5270806898), (82.7768327513, -16.2066456898)],
                knots=[0, 0, 0, 0, 1, 1, 1, 1], degree=3))
            Line((82.7768327513, -16.2066456898), (63.5000457513, -16.2066456898))
            add(Edge.make_bspline(
                [(63.5000457513, -16.2066456898), (57.1380727513, -16.1648706898), (58.7067867513, -12.4673406898), (58.8225907513, -10.9622406898)],
                knots=[0, 0, 0, 0, 1, 1, 1, 1], degree=3))
            Line((58.8225907513, -10.9622406898), (72.7132127513, 5.3379973102))
        make_face(mode=Mode.SUBTRACT)
        with BuildLine():
            add(Edge.make_bspline(
                [(4.2522797513, 13.9133163102), (5.0251887513, 18.5193293102), (9.4633147513, 17.9503943102), (11.1621567513, 15.5787743102)],
                knots=[0, 0, 0, 0, 1, 1, 1, 1], degree=3))
            Line((11.1621567513, 15.5787743102), (20.9422897513, 3.5307823102))
            add(Edge.make_bspline(
                [(20.9422897513, 3.5307823102), (21.3510167513, 2.4878923102), (21.7530967513, 1.2352573102), (19.4311007513, 1.7529523102)],
                knots=[0, 0, 0, 0, 1, 1, 1, 1], degree=3))
            add(Edge.make_bspline(
                [(19.4311007513, 1.7529523102), (15.4182557513, 2.7136493102), (11.2374477513, 2.8345273102), (7.0996287513, 3.1703543102)],
                knots=[0, 0, 0, 0, 1, 1, 1, 1], degree=3))
            add(Edge.make_bspline(
                [(7.0996287513, 3.1703543102), (4.4484227513, 2.8037243102), (4.6391687513, 4.0357343102), (4.2522797513, 5.1962473102)],
                knots=[0, 0, 0, 0, 1, 1, 1, 1], degree=3))
            Line((4.2522797513, 5.1962473102), (4.2522797513, 13.9133163102))
        make_face(mode=Mode.SUBTRACT)
        with BuildLine():
            add(Edge.make_bspline(
                [(20.5525017513, 12.2833043102), (20.0676617513, 14.6816013102), (20.5440417513, 16.3586093102), (24.0960287513, 17.0670743102)],
                knots=[0, 0, 0, 0, 1, 1, 1, 1], degree=3))
            Line((24.0960287513, 17.0670743102), (40.6797337513, 16.2520573102))
            Line((40.6797337513, 16.2520573102), (49.4676807513, 15.1181243102))
            Line((49.4676807513, 15.1181243102), (59.2478147513, 13.4172363102))
            Line((59.2478147513, 13.4172363102), (65.4844207513, 11.8580763102))
            add(Edge.make_bspline(
                [(65.4844207513, 11.8580763102), (67.5337397513, 10.6827963102), (67.6491757513, 8.8628913102), (66.9018317513, 6.7553913102)],
                knots=[0, 0, 0, 0, 1, 1, 1, 1], degree=3))
            Line((66.9018317513, 6.7553913102), (49.8929027513, -14.0805456898))
            add(Edge.make_bspline(
                [(49.8929027513, -14.0805456898), (47.2968437513, -16.6023676898), (45.5455047513, -15.5763756898), (43.9397777513, -13.9388026898)],
                knots=[0, 0, 0, 0, 1, 1, 1, 1], degree=3))
            Line((43.9397777513, -13.9388026898), (20.5525017513, 12.2833043102))
        make_face(mode=Mode.SUBTRACT)
    extrude(amount=F1_DEPTH)

    # F2: F1 across plane


with BuildPart() as f1_1:
    add(f1.part)
    add(f1.part.mirror(Plane.YZ))


solid = f1_1.part
